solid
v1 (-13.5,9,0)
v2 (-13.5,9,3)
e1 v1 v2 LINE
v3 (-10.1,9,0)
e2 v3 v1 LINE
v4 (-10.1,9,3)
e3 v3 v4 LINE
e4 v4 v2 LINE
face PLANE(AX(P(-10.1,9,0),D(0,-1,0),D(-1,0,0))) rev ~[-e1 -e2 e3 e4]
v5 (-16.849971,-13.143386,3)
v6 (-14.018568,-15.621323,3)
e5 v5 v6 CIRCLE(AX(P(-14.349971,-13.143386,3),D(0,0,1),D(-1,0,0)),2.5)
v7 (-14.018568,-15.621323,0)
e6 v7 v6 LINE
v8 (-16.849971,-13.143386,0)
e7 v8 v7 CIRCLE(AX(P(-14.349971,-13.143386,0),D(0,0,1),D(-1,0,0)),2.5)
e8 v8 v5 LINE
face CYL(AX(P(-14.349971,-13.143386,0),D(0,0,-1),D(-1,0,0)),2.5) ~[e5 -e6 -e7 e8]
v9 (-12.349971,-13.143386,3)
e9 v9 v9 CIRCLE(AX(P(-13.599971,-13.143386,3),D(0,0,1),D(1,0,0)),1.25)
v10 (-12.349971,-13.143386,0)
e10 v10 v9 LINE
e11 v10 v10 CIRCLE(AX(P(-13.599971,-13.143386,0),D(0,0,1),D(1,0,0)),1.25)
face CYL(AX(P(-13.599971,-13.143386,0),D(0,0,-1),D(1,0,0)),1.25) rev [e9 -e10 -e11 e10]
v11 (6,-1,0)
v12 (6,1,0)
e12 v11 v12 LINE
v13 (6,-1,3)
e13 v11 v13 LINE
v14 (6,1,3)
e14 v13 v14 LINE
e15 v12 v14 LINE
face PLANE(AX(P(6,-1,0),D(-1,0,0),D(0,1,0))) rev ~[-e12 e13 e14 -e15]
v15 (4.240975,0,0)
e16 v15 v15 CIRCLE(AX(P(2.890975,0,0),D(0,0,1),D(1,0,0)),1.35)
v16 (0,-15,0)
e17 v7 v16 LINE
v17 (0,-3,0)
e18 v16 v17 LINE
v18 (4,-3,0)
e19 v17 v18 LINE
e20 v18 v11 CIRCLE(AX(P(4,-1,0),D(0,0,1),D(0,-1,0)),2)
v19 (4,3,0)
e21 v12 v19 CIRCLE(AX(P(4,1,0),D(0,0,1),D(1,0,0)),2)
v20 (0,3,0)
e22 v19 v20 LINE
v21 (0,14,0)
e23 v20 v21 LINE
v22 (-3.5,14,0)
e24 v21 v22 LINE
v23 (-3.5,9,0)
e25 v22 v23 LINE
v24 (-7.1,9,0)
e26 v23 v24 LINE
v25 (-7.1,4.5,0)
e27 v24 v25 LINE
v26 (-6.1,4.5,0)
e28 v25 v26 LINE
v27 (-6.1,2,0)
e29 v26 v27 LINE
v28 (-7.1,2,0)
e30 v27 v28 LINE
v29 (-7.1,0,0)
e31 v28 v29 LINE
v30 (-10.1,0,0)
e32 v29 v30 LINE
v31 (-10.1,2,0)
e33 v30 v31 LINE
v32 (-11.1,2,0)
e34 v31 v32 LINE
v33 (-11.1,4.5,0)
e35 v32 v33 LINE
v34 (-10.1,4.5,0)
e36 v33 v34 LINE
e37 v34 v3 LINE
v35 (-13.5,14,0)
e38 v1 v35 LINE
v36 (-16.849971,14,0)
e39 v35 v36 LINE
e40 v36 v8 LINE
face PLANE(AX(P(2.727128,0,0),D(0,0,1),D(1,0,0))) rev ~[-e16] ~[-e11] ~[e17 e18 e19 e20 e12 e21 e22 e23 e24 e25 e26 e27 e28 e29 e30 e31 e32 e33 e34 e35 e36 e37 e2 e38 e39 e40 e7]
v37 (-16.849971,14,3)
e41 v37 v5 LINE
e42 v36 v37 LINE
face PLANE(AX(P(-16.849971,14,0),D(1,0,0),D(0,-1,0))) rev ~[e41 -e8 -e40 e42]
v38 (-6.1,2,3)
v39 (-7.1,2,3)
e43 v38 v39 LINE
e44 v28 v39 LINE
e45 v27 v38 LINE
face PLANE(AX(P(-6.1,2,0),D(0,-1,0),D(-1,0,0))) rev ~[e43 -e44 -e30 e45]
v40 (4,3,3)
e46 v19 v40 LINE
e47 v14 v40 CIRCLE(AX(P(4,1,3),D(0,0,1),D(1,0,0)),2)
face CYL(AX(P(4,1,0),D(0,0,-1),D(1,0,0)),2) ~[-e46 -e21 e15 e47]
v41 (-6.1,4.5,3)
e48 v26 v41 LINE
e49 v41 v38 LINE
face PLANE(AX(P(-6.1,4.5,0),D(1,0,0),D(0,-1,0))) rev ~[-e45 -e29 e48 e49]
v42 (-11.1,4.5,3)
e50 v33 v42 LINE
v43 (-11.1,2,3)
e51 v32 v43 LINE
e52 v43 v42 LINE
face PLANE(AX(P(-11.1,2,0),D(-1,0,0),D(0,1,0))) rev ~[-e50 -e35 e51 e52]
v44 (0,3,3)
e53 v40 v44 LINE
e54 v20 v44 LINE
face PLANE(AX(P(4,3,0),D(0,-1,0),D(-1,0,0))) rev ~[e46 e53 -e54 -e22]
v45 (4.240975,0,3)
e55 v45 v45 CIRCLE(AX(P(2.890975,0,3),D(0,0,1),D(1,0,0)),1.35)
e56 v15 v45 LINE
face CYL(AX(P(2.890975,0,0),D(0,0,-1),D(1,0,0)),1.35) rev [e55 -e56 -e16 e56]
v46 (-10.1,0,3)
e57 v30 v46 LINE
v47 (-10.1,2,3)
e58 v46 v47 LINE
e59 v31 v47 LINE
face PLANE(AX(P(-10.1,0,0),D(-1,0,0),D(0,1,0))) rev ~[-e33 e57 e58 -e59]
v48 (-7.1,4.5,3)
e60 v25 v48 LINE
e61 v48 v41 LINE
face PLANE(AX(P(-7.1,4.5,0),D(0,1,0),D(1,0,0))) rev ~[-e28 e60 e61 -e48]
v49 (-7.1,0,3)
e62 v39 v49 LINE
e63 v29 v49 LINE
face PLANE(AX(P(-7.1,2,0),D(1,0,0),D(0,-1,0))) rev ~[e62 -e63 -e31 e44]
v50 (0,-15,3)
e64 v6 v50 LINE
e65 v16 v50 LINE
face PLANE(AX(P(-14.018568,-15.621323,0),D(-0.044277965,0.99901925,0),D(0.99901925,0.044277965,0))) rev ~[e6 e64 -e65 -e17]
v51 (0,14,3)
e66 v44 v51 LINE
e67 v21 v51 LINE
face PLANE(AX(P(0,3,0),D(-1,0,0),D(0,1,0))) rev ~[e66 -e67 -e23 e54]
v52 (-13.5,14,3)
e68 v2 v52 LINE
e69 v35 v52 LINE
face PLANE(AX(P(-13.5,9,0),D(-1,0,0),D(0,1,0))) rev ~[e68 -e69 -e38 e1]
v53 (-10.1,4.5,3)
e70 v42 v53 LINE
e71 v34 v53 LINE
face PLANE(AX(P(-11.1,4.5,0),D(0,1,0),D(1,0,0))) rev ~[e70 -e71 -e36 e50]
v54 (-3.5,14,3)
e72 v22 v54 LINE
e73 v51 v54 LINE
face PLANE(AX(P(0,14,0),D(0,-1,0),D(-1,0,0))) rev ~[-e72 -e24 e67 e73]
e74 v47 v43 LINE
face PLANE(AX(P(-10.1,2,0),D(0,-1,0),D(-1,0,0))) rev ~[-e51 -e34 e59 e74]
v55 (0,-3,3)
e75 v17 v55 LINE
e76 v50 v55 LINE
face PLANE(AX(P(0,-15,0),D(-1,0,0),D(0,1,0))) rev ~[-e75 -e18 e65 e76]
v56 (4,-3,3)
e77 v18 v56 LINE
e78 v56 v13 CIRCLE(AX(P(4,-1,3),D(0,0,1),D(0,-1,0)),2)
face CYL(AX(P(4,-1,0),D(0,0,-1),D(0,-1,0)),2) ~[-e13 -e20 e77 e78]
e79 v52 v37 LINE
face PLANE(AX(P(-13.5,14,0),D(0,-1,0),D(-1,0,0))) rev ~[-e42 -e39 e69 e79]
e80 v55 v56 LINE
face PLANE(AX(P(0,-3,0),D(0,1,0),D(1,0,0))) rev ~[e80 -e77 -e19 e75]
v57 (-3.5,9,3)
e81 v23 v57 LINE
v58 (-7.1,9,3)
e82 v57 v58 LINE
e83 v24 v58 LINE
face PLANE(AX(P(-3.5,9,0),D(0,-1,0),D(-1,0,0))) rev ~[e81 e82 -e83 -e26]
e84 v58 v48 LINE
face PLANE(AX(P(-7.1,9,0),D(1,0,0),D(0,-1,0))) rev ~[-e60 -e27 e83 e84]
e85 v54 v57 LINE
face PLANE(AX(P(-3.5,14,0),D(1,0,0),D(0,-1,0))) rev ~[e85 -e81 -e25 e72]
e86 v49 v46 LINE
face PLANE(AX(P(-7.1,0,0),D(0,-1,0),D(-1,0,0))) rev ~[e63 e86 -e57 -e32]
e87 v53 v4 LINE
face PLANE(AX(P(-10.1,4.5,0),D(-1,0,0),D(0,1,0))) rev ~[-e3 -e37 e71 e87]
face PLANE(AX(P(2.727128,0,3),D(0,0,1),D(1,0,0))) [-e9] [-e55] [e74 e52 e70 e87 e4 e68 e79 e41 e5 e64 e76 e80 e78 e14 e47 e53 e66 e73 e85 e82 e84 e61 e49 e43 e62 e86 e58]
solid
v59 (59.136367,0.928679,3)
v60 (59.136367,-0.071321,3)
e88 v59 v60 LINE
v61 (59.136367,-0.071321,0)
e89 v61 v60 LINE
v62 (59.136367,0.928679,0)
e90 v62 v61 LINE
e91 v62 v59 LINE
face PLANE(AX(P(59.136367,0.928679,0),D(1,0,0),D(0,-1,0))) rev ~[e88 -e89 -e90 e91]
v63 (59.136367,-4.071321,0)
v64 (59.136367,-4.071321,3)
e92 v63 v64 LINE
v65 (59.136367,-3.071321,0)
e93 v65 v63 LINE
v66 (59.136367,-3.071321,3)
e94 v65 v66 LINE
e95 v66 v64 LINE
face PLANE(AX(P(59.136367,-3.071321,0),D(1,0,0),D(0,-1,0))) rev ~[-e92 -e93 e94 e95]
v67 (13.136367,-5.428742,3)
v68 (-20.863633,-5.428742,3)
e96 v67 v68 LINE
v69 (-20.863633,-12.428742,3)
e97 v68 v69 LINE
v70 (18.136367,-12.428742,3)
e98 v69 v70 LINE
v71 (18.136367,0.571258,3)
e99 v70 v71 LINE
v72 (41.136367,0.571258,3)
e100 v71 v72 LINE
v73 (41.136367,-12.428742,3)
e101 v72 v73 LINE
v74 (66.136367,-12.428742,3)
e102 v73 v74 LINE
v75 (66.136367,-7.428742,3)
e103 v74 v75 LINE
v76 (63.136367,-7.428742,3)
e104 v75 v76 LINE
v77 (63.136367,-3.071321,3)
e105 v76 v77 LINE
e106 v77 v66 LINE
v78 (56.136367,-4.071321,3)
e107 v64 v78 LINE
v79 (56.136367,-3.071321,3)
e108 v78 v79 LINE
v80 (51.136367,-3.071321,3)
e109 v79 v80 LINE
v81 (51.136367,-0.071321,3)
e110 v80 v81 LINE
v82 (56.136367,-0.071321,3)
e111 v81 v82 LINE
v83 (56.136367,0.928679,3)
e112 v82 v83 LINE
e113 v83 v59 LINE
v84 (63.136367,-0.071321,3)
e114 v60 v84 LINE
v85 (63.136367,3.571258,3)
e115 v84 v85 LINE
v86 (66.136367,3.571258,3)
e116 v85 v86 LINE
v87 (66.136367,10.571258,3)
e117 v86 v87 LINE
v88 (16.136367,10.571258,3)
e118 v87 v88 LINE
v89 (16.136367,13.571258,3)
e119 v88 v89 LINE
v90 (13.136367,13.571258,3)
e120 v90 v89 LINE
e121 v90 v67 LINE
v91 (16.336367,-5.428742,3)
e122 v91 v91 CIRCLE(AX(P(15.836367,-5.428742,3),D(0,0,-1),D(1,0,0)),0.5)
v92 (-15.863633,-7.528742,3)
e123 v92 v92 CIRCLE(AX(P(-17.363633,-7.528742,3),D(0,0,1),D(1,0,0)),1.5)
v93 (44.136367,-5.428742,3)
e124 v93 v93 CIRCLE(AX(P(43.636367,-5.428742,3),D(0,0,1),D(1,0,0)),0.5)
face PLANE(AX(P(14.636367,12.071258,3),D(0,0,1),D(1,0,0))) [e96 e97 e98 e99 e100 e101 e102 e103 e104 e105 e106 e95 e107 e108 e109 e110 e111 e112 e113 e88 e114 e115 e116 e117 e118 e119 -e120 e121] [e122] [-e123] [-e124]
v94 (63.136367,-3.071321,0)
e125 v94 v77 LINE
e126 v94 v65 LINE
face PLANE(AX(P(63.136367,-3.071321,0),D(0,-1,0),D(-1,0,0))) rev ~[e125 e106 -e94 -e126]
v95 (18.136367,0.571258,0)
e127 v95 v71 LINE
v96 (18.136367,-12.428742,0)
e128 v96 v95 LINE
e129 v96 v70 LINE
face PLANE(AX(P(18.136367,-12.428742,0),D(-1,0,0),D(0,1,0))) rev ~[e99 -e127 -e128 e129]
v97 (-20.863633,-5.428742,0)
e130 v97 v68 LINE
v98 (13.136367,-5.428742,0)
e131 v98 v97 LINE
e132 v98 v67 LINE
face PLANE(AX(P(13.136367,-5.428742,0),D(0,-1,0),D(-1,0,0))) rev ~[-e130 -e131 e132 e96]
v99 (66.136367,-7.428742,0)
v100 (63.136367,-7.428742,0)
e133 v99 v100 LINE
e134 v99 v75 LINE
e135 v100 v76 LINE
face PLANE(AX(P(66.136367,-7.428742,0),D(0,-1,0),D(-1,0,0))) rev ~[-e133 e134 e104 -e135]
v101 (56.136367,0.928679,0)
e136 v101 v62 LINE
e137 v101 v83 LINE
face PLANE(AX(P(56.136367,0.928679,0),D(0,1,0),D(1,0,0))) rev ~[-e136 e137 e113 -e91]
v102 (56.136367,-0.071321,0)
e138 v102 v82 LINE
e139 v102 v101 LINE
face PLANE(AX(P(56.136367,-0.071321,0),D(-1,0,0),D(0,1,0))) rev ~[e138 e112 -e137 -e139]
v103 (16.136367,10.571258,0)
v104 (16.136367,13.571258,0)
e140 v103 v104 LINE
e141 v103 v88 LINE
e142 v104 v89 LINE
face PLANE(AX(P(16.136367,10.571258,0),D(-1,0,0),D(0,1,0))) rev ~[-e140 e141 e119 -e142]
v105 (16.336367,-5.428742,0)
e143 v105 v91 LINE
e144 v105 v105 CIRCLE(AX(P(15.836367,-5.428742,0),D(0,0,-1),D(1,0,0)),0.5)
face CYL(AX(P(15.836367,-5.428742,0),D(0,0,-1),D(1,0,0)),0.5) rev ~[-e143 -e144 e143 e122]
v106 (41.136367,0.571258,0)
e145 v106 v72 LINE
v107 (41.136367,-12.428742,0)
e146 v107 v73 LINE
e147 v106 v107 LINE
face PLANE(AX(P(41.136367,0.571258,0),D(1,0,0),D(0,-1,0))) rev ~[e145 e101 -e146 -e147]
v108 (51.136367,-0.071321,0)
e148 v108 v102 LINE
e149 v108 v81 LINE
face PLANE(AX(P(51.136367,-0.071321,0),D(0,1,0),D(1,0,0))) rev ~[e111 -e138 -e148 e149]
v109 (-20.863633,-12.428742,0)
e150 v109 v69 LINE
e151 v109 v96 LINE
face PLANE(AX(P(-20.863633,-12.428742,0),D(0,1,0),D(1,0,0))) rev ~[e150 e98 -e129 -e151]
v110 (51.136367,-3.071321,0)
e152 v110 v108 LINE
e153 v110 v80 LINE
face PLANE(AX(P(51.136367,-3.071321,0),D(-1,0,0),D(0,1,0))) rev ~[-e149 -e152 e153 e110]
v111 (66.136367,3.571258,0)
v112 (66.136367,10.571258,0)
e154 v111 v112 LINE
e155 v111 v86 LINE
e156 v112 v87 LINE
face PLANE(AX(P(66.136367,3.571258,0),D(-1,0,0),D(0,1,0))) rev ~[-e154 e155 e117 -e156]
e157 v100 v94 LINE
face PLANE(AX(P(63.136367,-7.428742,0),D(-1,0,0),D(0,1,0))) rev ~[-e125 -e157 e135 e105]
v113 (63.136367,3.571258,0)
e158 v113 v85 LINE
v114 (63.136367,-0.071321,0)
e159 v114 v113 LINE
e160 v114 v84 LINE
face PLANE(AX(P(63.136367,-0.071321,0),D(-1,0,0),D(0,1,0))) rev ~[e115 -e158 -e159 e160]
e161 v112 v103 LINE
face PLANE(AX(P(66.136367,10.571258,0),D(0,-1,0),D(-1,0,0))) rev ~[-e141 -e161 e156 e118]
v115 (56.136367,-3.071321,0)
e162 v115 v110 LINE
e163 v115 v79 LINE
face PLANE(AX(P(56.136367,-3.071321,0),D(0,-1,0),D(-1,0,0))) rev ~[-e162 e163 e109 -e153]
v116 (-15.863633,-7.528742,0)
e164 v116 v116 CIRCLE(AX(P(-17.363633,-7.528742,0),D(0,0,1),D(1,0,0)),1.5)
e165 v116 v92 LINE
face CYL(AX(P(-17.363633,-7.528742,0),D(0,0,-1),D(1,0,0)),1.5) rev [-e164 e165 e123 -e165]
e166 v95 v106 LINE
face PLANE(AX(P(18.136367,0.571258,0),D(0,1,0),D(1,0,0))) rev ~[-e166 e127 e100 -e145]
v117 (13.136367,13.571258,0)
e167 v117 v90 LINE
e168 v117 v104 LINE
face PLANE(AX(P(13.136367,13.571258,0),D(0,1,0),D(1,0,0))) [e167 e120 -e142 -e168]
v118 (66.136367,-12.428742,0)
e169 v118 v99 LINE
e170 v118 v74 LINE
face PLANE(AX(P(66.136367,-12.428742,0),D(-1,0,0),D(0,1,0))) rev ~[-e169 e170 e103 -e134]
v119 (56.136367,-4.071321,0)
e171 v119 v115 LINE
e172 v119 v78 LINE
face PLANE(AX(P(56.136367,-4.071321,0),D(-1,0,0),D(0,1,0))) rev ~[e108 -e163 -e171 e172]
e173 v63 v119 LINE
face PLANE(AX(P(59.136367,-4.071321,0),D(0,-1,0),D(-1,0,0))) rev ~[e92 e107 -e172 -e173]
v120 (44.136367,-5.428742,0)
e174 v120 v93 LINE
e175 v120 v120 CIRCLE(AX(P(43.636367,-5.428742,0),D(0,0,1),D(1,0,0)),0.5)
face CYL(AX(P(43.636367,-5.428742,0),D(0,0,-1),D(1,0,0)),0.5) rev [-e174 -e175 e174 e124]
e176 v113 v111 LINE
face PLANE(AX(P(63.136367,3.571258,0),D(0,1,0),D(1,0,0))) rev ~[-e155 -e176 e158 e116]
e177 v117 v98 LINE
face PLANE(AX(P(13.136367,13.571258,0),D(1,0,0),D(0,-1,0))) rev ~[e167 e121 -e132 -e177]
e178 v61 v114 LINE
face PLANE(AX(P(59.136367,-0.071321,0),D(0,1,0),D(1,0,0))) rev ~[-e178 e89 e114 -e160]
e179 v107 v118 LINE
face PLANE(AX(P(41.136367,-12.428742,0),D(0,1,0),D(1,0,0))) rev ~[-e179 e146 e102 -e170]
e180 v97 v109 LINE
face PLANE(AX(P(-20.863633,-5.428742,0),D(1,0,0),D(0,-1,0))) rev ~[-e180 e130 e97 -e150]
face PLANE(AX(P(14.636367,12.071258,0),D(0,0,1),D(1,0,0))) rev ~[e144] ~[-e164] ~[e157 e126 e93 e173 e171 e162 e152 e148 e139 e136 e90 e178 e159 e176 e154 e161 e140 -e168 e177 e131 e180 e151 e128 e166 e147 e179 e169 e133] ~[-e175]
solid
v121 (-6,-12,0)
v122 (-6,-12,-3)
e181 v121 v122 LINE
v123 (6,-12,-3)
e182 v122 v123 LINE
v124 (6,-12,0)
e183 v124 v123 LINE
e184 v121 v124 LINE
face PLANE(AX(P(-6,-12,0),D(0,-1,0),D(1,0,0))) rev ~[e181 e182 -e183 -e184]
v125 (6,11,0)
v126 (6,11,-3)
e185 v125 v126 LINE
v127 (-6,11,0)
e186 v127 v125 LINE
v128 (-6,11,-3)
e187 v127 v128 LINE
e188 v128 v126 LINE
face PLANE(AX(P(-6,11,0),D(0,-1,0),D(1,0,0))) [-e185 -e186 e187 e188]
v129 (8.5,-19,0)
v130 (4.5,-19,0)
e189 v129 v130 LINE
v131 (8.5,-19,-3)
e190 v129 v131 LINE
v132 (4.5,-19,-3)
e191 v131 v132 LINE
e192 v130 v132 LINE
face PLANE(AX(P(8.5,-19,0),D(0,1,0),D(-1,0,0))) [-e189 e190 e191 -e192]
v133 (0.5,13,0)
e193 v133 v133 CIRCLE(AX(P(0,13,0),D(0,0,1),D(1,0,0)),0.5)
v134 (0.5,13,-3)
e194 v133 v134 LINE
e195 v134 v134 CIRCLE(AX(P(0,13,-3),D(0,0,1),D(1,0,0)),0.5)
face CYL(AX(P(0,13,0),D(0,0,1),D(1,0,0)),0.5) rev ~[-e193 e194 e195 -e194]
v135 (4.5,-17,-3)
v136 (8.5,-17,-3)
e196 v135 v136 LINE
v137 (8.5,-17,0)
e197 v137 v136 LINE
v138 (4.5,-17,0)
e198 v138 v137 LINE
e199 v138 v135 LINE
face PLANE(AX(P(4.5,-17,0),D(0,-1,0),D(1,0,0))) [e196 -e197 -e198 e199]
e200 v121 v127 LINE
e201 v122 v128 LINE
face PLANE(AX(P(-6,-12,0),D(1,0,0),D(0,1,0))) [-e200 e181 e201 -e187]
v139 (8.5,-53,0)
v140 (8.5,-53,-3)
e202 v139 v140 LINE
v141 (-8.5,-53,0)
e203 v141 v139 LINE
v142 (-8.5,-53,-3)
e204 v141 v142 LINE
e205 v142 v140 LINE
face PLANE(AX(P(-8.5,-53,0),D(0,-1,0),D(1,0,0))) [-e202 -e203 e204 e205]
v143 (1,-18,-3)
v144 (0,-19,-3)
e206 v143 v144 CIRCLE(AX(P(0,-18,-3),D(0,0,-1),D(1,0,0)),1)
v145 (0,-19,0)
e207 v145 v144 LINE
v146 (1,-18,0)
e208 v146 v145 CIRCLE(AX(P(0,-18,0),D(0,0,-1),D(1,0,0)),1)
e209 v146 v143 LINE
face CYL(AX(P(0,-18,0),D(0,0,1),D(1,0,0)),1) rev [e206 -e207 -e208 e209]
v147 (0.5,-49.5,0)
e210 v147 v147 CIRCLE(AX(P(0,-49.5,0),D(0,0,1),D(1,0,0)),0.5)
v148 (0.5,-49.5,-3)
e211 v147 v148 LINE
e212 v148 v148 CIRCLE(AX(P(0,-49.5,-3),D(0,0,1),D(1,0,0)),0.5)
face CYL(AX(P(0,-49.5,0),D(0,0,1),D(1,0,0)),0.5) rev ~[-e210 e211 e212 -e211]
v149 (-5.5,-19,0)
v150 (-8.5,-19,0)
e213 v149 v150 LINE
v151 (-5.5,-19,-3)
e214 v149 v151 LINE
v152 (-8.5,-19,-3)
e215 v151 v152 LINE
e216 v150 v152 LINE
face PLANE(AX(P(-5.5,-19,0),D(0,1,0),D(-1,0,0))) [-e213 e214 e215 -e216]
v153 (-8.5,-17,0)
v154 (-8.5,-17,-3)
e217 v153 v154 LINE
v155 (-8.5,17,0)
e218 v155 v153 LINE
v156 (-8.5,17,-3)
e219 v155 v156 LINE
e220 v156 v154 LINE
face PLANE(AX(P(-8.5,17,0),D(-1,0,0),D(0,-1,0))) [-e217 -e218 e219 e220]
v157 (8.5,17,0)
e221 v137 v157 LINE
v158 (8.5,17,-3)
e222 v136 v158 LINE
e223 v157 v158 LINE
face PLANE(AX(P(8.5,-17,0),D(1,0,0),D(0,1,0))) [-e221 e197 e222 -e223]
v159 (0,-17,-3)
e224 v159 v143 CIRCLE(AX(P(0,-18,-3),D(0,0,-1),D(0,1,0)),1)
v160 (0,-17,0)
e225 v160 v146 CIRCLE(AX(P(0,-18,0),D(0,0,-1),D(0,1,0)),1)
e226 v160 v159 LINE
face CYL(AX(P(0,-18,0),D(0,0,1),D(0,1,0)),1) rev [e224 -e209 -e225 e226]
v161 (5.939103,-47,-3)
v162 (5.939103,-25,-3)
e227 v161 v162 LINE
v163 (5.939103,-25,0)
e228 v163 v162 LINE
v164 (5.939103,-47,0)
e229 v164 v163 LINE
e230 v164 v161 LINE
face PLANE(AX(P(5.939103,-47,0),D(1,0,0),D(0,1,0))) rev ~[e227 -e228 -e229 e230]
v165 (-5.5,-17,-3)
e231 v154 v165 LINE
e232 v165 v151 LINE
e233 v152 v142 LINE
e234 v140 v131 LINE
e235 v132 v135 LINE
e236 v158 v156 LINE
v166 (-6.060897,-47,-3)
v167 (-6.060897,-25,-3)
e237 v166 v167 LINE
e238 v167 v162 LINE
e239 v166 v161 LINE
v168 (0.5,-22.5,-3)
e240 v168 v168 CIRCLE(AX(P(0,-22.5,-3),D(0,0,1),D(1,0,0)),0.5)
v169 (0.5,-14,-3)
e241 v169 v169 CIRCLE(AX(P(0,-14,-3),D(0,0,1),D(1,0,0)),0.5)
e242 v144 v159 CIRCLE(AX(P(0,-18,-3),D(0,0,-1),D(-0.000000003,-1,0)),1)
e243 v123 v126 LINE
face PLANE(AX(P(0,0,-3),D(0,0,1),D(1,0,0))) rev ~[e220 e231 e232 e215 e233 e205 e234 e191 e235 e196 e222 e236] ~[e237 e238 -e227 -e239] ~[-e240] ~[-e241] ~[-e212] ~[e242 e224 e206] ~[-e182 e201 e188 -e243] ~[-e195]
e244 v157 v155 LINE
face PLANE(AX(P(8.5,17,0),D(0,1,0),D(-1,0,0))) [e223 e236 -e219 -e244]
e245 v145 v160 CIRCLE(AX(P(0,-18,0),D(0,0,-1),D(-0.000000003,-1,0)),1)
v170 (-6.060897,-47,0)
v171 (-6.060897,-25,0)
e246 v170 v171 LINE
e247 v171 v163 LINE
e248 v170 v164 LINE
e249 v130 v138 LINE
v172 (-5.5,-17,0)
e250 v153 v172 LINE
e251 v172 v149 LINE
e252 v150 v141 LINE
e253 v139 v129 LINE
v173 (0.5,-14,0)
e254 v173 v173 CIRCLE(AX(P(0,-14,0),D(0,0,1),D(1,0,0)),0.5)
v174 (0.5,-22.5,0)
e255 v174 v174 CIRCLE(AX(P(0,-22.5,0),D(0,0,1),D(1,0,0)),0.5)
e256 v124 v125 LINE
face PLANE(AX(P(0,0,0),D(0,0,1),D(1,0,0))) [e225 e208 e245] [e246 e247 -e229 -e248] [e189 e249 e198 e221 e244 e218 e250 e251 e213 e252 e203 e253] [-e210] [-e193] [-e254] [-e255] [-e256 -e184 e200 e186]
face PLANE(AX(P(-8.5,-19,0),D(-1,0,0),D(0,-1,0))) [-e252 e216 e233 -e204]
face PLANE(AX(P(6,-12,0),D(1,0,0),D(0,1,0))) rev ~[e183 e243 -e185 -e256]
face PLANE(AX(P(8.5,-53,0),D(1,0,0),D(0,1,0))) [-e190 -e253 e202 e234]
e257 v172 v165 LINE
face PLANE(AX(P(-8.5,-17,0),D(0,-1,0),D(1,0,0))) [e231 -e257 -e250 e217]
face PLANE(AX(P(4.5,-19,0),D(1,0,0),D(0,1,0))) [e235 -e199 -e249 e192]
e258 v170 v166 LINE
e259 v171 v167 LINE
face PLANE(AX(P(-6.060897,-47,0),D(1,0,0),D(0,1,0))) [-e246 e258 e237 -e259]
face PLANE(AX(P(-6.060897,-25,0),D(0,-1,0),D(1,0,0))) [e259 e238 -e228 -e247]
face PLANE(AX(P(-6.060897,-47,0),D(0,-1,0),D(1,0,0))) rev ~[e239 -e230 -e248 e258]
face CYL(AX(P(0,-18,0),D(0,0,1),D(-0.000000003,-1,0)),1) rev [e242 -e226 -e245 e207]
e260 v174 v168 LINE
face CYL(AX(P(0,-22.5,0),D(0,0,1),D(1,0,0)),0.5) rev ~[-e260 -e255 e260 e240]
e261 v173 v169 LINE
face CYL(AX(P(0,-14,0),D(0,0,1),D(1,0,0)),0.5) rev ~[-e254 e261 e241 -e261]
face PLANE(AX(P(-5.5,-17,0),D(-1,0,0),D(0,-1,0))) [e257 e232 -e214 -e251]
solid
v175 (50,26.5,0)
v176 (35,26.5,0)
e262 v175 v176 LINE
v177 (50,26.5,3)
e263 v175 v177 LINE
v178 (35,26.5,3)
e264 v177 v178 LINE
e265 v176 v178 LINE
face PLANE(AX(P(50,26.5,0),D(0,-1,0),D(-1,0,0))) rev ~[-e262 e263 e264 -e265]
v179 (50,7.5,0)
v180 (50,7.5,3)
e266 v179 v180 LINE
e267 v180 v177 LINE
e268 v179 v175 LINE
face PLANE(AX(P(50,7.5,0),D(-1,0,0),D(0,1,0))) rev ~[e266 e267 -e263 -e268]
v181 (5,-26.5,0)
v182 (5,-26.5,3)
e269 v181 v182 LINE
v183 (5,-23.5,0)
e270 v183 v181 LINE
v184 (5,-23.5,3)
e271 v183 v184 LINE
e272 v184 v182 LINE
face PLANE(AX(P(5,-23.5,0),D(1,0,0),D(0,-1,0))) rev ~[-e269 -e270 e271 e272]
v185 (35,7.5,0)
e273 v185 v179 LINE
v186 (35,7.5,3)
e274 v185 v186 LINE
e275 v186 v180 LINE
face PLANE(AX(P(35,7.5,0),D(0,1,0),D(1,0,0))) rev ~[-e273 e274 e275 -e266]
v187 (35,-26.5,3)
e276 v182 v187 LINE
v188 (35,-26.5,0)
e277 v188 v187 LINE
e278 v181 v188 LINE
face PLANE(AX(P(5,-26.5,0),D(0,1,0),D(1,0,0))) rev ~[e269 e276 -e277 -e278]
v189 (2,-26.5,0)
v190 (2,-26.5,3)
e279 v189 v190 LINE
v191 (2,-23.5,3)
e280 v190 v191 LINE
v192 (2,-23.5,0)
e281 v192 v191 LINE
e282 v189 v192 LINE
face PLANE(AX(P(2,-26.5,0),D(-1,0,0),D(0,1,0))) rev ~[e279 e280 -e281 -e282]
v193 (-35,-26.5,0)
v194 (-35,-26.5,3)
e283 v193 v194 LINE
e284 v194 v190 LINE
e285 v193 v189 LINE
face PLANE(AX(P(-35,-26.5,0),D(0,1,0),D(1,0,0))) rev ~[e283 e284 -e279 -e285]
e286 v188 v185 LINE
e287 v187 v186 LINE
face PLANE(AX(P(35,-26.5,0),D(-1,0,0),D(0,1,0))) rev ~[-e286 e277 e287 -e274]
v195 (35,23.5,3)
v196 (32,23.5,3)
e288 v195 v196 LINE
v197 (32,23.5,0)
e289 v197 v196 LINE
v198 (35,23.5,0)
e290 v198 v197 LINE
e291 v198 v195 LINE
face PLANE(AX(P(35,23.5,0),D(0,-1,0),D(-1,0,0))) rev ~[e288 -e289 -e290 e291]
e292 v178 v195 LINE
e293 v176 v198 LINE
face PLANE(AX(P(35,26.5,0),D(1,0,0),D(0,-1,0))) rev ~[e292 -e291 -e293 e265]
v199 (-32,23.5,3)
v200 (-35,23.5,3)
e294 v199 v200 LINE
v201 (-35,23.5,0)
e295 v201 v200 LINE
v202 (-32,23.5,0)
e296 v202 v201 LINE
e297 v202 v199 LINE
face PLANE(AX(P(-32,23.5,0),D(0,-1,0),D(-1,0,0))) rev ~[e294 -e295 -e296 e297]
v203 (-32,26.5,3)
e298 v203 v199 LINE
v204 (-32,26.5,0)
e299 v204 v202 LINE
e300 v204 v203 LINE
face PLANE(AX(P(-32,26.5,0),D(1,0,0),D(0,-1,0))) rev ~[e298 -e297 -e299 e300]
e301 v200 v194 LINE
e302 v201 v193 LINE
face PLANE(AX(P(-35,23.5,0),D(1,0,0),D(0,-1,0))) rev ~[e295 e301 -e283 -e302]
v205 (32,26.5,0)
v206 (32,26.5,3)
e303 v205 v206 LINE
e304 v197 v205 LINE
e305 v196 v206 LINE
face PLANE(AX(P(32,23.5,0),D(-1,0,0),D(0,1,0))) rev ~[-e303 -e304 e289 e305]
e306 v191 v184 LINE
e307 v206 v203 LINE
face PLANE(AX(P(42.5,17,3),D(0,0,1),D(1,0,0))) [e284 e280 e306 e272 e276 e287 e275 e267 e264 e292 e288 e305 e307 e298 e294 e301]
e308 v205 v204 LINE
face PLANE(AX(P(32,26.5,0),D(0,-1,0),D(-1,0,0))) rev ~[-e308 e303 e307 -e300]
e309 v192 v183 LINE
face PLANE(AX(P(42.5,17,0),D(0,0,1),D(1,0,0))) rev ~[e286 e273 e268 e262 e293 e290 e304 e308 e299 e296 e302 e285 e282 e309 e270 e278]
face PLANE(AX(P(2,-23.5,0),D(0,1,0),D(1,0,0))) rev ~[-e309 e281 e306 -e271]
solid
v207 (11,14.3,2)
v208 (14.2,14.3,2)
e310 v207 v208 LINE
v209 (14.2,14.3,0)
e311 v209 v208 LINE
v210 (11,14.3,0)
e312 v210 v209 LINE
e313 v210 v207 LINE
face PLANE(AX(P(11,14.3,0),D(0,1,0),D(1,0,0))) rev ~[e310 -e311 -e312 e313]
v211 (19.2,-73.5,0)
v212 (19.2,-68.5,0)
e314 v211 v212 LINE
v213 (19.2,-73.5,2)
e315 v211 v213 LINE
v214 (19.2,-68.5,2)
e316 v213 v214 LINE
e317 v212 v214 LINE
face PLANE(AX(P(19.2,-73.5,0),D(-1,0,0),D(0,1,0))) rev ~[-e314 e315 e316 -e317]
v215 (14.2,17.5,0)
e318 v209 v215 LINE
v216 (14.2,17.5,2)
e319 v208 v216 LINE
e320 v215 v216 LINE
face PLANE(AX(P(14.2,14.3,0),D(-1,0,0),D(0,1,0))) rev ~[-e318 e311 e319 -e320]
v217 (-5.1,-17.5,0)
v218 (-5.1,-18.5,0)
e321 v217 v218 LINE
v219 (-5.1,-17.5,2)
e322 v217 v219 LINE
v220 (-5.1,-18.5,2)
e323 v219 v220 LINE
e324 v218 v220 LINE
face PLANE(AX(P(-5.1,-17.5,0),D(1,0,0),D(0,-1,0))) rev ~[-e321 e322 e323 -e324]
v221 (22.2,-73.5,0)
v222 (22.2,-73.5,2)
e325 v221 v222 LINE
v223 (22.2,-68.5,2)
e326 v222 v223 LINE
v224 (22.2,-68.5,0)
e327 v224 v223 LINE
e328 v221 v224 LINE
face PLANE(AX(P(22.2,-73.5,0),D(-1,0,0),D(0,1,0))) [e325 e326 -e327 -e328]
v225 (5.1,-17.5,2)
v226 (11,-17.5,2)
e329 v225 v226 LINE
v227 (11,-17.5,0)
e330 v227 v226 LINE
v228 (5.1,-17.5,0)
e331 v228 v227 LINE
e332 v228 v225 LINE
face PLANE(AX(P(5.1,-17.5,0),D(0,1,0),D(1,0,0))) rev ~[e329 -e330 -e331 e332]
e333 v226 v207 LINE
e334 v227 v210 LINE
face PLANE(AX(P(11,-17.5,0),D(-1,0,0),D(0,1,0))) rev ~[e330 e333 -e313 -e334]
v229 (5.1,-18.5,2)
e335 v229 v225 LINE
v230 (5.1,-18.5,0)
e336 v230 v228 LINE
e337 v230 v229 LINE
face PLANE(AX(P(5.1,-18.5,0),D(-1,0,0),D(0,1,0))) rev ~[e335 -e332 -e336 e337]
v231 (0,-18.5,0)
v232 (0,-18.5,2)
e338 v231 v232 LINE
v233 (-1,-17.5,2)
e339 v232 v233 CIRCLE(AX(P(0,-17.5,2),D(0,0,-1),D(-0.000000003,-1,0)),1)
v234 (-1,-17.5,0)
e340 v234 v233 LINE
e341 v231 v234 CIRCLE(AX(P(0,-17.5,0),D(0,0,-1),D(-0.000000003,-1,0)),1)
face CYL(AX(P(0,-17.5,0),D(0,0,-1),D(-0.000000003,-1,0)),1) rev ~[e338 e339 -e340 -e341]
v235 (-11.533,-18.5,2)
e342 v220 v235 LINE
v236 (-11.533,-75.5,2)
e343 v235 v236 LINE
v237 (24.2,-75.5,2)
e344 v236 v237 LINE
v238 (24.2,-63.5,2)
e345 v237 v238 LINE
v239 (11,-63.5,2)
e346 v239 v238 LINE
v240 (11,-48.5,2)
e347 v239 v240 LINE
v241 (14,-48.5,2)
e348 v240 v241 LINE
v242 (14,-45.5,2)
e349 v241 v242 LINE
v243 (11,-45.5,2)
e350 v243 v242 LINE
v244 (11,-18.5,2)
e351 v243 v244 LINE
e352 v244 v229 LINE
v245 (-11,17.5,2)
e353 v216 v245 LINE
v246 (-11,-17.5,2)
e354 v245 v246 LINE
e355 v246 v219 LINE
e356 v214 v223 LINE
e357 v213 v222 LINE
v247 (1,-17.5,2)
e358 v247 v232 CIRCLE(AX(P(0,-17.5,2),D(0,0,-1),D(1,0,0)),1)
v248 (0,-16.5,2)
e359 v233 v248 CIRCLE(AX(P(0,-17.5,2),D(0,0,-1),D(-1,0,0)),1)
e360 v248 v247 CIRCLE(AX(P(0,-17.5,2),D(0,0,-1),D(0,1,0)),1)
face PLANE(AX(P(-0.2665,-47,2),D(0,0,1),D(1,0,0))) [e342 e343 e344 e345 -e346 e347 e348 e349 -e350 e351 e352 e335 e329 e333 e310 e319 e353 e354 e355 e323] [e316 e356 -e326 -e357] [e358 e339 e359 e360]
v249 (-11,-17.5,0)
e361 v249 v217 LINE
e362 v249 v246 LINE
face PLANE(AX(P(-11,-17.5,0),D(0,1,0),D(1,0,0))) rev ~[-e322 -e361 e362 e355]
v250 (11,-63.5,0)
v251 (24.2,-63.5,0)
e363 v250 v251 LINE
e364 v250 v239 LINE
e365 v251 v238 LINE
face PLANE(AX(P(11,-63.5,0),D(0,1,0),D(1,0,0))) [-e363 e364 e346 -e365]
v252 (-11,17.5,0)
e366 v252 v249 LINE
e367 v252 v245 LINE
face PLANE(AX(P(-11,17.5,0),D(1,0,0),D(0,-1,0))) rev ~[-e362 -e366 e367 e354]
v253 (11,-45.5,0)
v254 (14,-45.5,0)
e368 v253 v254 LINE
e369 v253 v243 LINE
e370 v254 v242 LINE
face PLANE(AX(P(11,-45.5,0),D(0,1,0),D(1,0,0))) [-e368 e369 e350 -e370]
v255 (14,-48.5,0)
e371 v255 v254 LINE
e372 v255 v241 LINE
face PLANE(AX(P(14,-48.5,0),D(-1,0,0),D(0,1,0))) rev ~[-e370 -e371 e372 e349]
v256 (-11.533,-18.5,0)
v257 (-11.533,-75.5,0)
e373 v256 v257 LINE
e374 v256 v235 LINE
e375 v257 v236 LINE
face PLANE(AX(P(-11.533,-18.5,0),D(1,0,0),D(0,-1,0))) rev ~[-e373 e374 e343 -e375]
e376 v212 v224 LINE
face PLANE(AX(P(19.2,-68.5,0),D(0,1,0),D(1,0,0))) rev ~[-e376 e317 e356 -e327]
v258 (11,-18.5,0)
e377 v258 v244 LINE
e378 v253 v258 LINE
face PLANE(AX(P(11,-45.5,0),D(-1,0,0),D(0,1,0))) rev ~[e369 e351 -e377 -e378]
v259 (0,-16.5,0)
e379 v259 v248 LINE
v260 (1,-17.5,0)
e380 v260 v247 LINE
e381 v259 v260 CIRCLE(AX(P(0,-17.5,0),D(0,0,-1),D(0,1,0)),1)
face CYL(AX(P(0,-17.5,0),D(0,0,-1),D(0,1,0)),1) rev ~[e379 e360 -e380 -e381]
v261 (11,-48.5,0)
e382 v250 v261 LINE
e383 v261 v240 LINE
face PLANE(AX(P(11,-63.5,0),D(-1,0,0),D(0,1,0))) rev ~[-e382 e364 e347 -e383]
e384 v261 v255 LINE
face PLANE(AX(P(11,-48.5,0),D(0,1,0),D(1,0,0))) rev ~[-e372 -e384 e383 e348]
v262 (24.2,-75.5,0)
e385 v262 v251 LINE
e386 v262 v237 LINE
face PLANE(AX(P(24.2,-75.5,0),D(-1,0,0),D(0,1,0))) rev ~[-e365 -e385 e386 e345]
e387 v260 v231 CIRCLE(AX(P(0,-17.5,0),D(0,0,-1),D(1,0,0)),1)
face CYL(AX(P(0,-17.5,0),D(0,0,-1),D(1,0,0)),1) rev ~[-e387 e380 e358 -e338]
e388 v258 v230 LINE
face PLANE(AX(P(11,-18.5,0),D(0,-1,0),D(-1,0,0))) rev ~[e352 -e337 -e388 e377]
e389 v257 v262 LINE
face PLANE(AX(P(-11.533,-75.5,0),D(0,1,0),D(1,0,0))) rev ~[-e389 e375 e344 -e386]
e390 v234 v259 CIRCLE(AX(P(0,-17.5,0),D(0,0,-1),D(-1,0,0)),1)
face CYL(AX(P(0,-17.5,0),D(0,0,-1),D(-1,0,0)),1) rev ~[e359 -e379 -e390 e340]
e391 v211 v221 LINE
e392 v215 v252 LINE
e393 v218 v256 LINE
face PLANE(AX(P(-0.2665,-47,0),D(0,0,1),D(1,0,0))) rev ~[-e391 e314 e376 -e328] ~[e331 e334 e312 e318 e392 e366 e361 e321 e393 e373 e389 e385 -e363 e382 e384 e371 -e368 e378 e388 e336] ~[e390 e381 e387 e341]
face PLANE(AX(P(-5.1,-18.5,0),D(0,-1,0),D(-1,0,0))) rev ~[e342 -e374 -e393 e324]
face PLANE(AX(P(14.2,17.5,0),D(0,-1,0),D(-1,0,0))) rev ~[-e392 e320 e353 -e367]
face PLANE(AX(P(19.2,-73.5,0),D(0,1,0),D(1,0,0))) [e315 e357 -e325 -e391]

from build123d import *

# Parameters (mm, degrees)
F0_W     = 13.2
F0_H     = 12
F0_W_2   = 3
F0_H_2   = 5
F0_H_3   = 3
F0_W_3   = 3.2
F0_H_4   = 3.2
F1_DEPTH = 2
F3_DEPTH = 3
F4_R     = 0.5
F4_W     = 12
F4_H     = 23
F4_H_2   = 22
F5_DEPTH = 3
F6_R     = 1.35
F6_R_2   = 1.25
F7_DEPTH = 3
F8_W     = 3
F8_H     = 3
F8_R     = 1.5
F8_R_2   = 0.5
F9_DEPTH = 3


with BuildPart() as f1:
    # F0 (on Top) → F1 (new body)
    with BuildSketch(Plane.XY):
        Polygon((-3.4e-09, -18.5), (-5.1, -18.5), (-11.533, -18.5), (-11.533, -75.5), (11, -75.5), (11, -63.5), (11, -48.5), (11, -45.5), (11, -18.5), (5.1, -18.5), align=None)
        with Locations((17.6, -69.5)):
            Rectangle(F0_W, F0_H)
        with Locations((20.7, -71)):
            Rectangle(F0_W_2, F0_H_2, mode=Mode.SUBTRACT)
        with Locations((12.5, -47)):
            Rectangle(F0_W_2, F0_H_3)
        Polygon((11, 14.3), (11, 17.5), (-11, 17.5), (-11, -17.5), (-5.1, -17.5), (-5.1, -16.5), (0, -16.5), (5.1, -16.5), (5.1, -17.5), (11, -17.5), align=None)
        with Locations((12.6, 15.9)):
            Rectangle(F0_W_3, F0_H_4)
        with BuildLine():
            Line((5.1, -18.5), (5.1, -17.5))
            Line((5.1, -17.5), (1, -17.5))
            ThreePointArc((1, -17.5), (0.70710678, -18.2071067824), (-3.4e-09, -18.5))
            Line((-3.4e-09, -18.5), (5.1, -18.5))
        make_face()
        with BuildLine():
            Line((1, -17.5), (5.1, -17.5))
            Line((5.1, -17.5), (5.1, -16.5))
            Line((5.1, -16.5), (0, -16.5))
            ThreePointArc((0, -16.5), (0.7071067812, -16.7928932188), (1, -17.5))
        make_face()
        with BuildLine():
            Line((-1, -17.5), (-5.1, -17.5))
            Line((-5.1, -17.5), (-5.1, -18.5))
            Line((-5.1, -18.5), (-3.4e-09, -18.5))
            ThreePointArc((-3.4e-09, -18.5), (-0.7071067824, -18.20710678), (-1, -17.5))
        make_face()
        with BuildLine():
            Line((-5.1, -16.5), (-5.1, -17.5))
            Line((-5.1, -17.5), (-1, -17.5))
            ThreePointArc((-1, -17.5), (-0.7071067812, -16.7928932188), (0, -16.5))
            Line((0, -16.5), (-5.1, -16.5))
        make_face()
    extrude(amount=F1_DEPTH)


with BuildPart() as f3:
    # F2 (on Top) → F3 (new body)
    with BuildSketch(Plane.XY):
        Polygon((50, 26.5), (35, 26.5), (35, 23.5), (35, 7.5), (50, 7.5), align=None)
        Polygon((32, 23.5), (32, 26.5), (-32, 26.5), (-32, 23.5), (-35, 23.5), (-35, -26.5), (2, -26.5), (2, -23.5), (5, -23.5), (5, -26.5), (35, -26.5), (35, 7.5), (35, 23.5), align=None)
    extrude(amount=F3_DEPTH)


with BuildPart() as f5:
    # F4 (on Top) → F5 (new body)
    with BuildSketch(Plane.XY):
        Polygon((8.5, -17), (8.5, 17), (-8.5, 17), (-8.5, -17), (-5.5, -17), (0, -17), (4.5, -17), align=None)
        with Locations((0, -14)):
            Circle(F4_R, mode=Mode.SUBTRACT)
        with Locations((0, -0.5)):
            Rectangle(F4_W, F4_H, mode=Mode.SUBTRACT)
        with Locations((0, 13)):
            Circle(F4_R, mode=Mode.SUBTRACT)
        with BuildLine():
            Line((4.5, -19), (4.5, -17))
            Line((4.5, -17), (0, -17))
            ThreePointArc((0, -17), (0.7071067812, -17.2928932188), (1, -18))
            ThreePointArc((1, -18), (0.70710678, -18.7071067824), (-3.4e-09, -19))
            Line((-3.4e-09, -19), (4.5, -19))
        make_face()
        with BuildLine():
            Line((0, -17), (-5.5, -17))
            Line((-5.5, -17), (-5.5, -19))
            Line((-5.5, -19), (-3.4e-09, -19))
            ThreePointArc((-3.4e-09, -19), (-1, -17.9999999983), (0, -17))
        make_face()
        Polygon((8.5, -19), (4.5, -19), (-3.4e-09, -19), (-5.5, -19), (-8.5, -19), (-8.5, -53), (8.5, -53), align=None)
        with Locations((-0.0608968027, -36)):
            Rectangle(F4_W, F4_H_2, mode=Mode.SUBTRACT)
        with Locations((0, -49.5)):
            Circle(F4_R, mode=Mode.SUBTRACT)
        with Locations((0, -22.5)):
            Circle(F4_R, mode=Mode.SUBTRACT)
    extrude(amount=-F5_DEPTH)


with BuildPart() as f7:
    # F6 (on Top) → F7 (new body)
    with BuildSketch(Plane.XY):
        with BuildLine():
            Line((4, 3), (0, 3))
            Line((0, 3), (0, -3))
            Line((0, -3), (4, -3))
            ThreePointArc((4, -3), (5.4142135624, -2.4142135624), (6, -1))
            Line((6, -1), (6, 1))
            ThreePointArc((6, 1), (5.4142135624, 2.4142135624), (4, 3))
        make_face()
        with Locations((2.8909749817, 0)):
            Circle(F6_R, mode=Mode.SUBTRACT)
        with BuildLine():
            Line((-13.5, 14), (-16.8499713292, 14))
            Line((-16.8499713292, 14), (-16.8499713292, -13.1433860515))
            ThreePointArc((-16.8499713292, -13.1433860515), (-15.9964054633, -15.0246767366), (-14.0185676156, -15.6213230117))
            Line((-14.0185676156, -15.6213230117), (0, -15))
            Line((0, -15), (0, -13.7464547476))
            Line((0, -13.7464547476), (0, -3))
            Line((0, -3), (0, 3))
            Line((0, 3), (0, 14))
            Line((0, 14), (-3.5, 14))
            Line((-3.5, 14), (-3.5, 9))
            Line((-3.5, 9), (-7.1, 9))
            Line((-7.1, 9), (-7.1, 4.5))
            Line((-7.1, 4.5), (-6.1, 4.5))
            Line((-6.1, 4.5), (-6.1, 2))
            Line((-6.1, 2), (-7.1, 2))
            Line((-7.1, 2), (-7.1, 0))
            Line((-7.1, 0), (-10.1, 0))
            Line((-10.1, 0), (-10.1, 2))
            Line((-10.1, 2), (-11.1, 2))
            Line((-11.1, 2), (-11.1, 4.5))
            Line((-11.1, 4.5), (-10.1, 4.5))
            Line((-10.1, 4.5), (-10.1, 9))
            Line((-10.1, 9), (-13.5, 9))
            Line((-13.5, 9), (-13.5, 14))
        make_face()
        with Locations((-13.5999713292, -13.1433860515)):
            Circle(F6_R_2, mode=Mode.SUBTRACT)
    extrude(amount=F7_DEPTH)


with BuildPart() as f9:
    # F8 (on Top) → F9 (new body)
    with BuildSketch(Plane.XY):
        with Locations((14.6363672018, 12.071258156)):
            Rectangle(F8_W, F8_H)
        with BuildLine():
            Line((13.1363672018, -5.428741844), (-20.8636327982, -5.428741844))
            Line((-20.8636327982, -5.428741844), (-20.8636327982, -12.428741844))
            Line((-20.8636327982, -12.428741844), (18.1363672018, -12.428741844))
            Line((18.1363672018, -12.428741844), (18.1363672018, -5.428741844))
            Line((18.1363672018, -5.428741844), (16.3363672018, -5.428741844))
            ThreePointArc((16.3363672018, -5.428741844), (15.8363672018, -5.928741844), (15.3363672018, -5.428741844))
            Line((15.3363672018, -5.428741844), (13.1363672018, -5.428741844))
        make_face()
        with Locations((-17.3636327982, -7.528741844)):
            Circle(F8_R, mode=Mode.SUBTRACT)
        with BuildLine():
            Line((13.1363672018, 10.571258156), (13.1363672018, -5.428741844))
            Line((13.1363672018, -5.428741844), (15.3363672018, -5.428741844))
            ThreePointArc((15.3363672018, -5.428741844), (15.8363672018, -4.928741844), (16.3363672018, -5.428741844))
            Line((16.3363672018, -5.428741844), (18.1363672018, -5.428741844))
            Line((18.1363672018, -5.428741844), (18.1363672018, 0.571258156))
            Line((18.1363672018, 0.571258156), (18.1363672018, 10.571258156))
            Line((18.1363672018, 10.571258156), (16.1363672018, 10.571258156))
            Line((16.1363672018, 10.571258156), (13.1363672018, 10.571258156))
        make_face()
        Polygon((41.1363672018, 0.571258156), (41.1363672018, -12.428741844), (66.1363672018, -12.428741844), (66.1363672018, -7.428741844), (63.1363672018, -7.428741844), (63.1363672018, -3.0713211745), (59.1363672018, -3.0713211745), (59.1363672018, -4.0713211745), (56.1363672018, -4.0713211745), (56.1363672018, -3.0713211745), (51.1363672018, -3.0713211745), (51.1363672018, -0.0713211745), (56.1363672018, -0.0713211745), (56.1363672018, 0.9286788255), (59.1363672018, 0.9286788255), (59.1363672018, -0.0713211745), (63.1363672018, -0.0713211745), (63.1363672018, 3.571258156), (66.1363672018, 3.571258156), (66.1363672018, 10.571258156), (18.1363672018, 10.571258156), (18.1363672018, 0.571258156), align=None)
        with Locations((43.6363672018, -5.428741844)):
            Circle(F8_R_2, mode=Mode.SUBTRACT)
    extrude(amount=F9_DEPTH)


solid = Compound([f1.part, f3.part, f5.part, f7.part, f9.part])
